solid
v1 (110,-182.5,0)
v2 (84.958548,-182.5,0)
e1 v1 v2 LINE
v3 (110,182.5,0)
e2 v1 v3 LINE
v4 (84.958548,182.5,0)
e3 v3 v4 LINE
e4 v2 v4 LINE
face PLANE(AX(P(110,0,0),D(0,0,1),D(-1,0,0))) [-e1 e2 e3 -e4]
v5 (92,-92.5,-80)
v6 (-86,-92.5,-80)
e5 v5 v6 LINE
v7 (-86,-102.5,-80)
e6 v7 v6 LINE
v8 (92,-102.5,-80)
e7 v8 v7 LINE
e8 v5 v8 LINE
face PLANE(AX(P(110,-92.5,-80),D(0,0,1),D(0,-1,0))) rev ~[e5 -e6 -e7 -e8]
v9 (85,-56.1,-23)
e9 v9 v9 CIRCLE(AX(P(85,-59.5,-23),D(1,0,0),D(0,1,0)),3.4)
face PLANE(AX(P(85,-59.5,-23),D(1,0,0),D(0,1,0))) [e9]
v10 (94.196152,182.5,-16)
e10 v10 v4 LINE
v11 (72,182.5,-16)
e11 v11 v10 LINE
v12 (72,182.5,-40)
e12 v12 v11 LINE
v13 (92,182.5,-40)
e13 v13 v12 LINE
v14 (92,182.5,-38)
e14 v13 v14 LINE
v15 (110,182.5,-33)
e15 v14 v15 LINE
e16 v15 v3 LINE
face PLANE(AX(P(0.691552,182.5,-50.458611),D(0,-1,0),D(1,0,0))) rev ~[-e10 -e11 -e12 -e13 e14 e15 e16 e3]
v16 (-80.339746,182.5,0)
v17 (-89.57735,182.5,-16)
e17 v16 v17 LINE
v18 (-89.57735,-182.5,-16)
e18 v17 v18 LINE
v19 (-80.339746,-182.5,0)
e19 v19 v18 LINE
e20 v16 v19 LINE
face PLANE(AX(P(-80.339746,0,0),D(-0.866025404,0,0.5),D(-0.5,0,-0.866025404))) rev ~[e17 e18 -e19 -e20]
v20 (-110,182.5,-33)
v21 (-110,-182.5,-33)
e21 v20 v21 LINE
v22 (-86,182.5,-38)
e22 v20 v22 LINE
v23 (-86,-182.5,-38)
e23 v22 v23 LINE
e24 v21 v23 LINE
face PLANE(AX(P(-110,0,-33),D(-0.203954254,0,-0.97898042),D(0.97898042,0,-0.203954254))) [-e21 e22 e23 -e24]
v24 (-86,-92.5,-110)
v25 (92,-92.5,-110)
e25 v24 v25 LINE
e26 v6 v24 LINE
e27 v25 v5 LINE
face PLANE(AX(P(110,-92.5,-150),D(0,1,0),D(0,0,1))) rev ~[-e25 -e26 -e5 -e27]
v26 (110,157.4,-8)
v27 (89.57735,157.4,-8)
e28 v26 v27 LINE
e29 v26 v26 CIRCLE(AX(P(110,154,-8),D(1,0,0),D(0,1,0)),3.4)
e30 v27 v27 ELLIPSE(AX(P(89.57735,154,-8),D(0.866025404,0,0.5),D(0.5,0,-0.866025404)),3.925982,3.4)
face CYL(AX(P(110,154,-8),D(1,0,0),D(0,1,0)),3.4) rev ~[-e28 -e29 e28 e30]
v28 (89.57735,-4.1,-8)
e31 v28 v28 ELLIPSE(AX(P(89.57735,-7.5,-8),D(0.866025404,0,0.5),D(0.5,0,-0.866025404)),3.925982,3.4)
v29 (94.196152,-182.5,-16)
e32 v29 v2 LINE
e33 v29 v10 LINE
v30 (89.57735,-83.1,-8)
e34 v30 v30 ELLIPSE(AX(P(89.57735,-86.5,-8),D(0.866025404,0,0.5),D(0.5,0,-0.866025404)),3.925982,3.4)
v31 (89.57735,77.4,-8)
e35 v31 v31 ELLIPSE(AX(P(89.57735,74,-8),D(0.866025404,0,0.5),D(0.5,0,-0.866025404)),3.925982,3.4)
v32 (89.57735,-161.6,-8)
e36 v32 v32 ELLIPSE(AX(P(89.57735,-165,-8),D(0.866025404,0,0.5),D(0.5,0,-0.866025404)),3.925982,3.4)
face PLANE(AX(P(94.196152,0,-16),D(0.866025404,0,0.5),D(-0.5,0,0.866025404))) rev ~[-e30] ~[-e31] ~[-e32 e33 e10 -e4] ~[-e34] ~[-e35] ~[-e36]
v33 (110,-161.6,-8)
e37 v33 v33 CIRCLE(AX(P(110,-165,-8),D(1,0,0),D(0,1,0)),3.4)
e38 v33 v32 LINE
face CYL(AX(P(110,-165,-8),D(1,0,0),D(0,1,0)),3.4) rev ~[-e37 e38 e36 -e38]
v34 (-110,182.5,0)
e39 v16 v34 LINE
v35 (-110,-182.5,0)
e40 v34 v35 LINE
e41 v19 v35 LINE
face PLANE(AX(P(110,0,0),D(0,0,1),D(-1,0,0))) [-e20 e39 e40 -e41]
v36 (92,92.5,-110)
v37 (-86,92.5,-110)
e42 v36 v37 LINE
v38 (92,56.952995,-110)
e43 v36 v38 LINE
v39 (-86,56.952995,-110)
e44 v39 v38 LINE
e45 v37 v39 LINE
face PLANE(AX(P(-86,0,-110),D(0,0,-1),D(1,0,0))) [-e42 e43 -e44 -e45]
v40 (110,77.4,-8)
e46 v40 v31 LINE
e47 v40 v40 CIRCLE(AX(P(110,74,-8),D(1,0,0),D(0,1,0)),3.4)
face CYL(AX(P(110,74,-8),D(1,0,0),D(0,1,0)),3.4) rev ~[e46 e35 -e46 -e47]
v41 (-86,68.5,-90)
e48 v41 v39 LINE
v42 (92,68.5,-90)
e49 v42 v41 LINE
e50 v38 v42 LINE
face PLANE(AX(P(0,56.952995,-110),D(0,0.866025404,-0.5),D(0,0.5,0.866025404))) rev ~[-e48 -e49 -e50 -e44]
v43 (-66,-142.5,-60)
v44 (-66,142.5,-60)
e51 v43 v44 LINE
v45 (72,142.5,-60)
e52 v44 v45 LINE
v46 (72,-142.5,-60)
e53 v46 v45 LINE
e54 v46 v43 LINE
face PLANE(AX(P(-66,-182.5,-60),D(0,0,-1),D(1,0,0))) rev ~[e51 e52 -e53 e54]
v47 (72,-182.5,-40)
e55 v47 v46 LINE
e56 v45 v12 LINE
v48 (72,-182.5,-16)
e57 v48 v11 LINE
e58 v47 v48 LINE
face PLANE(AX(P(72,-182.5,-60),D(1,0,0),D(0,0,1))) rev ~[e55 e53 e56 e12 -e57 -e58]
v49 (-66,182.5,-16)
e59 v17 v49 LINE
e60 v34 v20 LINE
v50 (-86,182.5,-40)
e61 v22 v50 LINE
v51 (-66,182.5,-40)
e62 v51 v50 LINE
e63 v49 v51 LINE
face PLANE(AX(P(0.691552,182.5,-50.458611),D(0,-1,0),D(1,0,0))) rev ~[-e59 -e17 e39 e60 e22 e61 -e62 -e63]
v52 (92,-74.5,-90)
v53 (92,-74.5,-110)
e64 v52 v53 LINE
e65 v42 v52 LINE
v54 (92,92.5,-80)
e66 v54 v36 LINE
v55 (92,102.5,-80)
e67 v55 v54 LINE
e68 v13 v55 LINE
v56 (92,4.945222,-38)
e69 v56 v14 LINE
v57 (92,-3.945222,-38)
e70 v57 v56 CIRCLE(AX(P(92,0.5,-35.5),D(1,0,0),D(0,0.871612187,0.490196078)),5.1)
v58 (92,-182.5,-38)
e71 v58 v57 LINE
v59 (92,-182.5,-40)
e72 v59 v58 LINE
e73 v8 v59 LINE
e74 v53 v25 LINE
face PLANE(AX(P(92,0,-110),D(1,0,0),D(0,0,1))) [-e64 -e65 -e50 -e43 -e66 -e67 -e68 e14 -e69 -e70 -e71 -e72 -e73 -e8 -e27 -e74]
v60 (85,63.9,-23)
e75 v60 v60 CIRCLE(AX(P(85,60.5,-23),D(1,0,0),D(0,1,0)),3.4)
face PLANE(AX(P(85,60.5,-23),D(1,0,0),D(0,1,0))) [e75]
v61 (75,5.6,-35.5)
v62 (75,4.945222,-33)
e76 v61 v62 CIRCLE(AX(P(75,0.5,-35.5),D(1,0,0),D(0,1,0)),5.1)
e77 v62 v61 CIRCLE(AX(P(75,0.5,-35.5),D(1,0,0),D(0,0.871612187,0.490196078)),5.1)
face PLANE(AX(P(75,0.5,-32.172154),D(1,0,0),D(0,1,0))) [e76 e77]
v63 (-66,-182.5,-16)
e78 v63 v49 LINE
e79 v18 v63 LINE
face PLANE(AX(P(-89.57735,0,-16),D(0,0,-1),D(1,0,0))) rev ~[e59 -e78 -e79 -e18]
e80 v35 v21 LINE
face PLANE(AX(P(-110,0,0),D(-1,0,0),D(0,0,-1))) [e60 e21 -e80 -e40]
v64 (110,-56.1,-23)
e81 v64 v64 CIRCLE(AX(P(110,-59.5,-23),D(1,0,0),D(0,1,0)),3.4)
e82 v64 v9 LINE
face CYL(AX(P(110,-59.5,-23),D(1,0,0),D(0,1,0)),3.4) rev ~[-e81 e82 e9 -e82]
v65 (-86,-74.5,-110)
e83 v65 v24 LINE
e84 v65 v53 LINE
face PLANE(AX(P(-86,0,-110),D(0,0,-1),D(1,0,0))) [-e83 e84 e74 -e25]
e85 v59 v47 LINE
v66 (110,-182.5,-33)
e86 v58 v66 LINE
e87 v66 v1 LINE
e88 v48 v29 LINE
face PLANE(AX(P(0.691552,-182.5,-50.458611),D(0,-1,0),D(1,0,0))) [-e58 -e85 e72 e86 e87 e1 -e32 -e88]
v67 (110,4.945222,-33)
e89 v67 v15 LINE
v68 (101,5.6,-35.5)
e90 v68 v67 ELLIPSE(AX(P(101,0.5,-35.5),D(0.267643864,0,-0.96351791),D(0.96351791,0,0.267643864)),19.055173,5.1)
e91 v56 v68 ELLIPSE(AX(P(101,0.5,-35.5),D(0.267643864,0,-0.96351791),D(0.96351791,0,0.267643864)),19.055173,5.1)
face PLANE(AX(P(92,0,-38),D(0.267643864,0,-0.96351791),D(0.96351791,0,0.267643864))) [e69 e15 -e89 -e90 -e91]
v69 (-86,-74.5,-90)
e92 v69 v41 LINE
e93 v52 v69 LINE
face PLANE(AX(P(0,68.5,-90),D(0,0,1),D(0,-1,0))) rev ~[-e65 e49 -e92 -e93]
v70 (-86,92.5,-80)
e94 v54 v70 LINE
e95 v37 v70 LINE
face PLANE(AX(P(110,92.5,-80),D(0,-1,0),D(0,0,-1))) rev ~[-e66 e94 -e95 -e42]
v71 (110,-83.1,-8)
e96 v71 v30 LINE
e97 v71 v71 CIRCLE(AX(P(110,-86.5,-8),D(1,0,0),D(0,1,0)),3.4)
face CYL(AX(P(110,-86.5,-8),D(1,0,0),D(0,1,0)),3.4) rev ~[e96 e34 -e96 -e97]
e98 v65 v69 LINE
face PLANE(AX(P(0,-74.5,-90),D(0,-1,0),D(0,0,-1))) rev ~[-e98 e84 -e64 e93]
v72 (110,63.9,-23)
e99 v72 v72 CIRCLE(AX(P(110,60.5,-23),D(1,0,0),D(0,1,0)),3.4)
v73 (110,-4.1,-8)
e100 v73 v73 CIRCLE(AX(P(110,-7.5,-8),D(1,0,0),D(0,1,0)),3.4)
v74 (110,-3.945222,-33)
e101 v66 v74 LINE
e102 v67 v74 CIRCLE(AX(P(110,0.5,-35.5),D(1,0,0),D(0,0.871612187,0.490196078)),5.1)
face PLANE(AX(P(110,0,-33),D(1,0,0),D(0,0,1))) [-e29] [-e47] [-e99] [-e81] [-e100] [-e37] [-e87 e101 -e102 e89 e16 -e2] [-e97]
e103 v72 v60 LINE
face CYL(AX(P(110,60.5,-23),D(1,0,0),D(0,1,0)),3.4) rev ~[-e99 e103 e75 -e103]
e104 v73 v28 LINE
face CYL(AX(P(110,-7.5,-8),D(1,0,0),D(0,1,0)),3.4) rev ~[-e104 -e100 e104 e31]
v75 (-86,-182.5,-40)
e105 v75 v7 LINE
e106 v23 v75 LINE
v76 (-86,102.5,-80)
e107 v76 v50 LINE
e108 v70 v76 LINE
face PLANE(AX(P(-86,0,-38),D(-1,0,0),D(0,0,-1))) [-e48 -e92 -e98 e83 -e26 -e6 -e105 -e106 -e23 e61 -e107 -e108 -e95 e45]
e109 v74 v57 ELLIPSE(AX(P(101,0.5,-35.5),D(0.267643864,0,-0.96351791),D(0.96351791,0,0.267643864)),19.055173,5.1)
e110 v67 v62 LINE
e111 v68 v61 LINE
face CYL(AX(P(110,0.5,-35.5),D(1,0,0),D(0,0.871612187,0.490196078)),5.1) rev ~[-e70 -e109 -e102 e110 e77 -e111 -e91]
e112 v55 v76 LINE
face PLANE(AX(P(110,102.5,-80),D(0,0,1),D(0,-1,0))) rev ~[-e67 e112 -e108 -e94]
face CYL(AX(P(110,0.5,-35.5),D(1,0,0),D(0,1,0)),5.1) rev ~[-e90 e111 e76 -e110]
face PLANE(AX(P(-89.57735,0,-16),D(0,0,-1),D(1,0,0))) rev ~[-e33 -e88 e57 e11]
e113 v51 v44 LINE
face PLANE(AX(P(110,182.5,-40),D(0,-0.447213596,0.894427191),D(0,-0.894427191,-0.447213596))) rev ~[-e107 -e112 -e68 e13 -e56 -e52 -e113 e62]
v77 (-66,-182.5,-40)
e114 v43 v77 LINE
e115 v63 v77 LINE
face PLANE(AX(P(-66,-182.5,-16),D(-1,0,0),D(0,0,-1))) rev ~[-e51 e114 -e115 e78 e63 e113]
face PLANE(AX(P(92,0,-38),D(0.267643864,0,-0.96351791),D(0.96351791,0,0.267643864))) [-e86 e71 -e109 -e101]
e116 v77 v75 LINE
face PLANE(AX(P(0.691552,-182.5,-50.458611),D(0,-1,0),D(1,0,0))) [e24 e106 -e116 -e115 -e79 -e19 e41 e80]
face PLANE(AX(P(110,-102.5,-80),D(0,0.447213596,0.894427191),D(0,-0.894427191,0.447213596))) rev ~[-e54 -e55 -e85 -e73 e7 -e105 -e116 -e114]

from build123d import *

# Parameters (mm, degrees)
F1_DEPTH  = 182.5
F3_DEPTH  = 200
F5_DEPTH  = 200
F7_DEPTH  = 220.001
F8_W      = 138
F8_H      = 20
F8_H_2    = 24
F9_DEPTH  = 365.001
F12_DEPTH = 35
F10_R     = 3.4
F14_DEPTH = 22.3866406461
F13_R     = 3.4
F15_DEPTH = 25
F16_DEPTH = 25


with BuildPart() as f1:
    # F0 (on Front) → F1 (new body, symmetric)
    with BuildSketch(Plane.XZ):
        Polygon((110, 0), (-110, 0), (-110, -33), (-86, -38), (-86, -110), (92, -110), (92, -38), (110, -33), align=None)
    extrude(amount=F1_DEPTH, both=True)

    # F2 (on Front) → F3 (cut, symmetric)
    with BuildSketch(Plane.XZ):
        Polygon((84.9585481157, 0), (-80.3397459622, 0), (-89.5773502692, -16), (94.1961524227, -16), align=None)
    extrude(amount=F3_DEPTH, both=True, mode=Mode.SUBTRACT)

    # F4 (on Right) → F5 (cut, symmetric)
    with BuildSketch(Plane.YZ):
        Polygon((-74.5, -90), (-74.5, -110), (56.9529946162, -110), (68.5, -90), align=None)
    extrude(amount=F5_DEPTH, both=True, mode=Mode.SUBTRACT)

    # F6 (on face) → F7 (cut, through all)
    with BuildSketch(Plane.YZ.offset(110)):
        Polygon((-102.5, -80), (-182.5, -40), (-182.5, -150), (-92.5, -150), (-92.5, -80), align=None)
        Polygon((182.5, -150), (182.5, -40), (102.5, -80), (92.5, -80), (92.5, -150), align=None)
    extrude(amount=-F7_DEPTH, mode=Mode.SUBTRACT)

    # F8 (on face) → F9 (cut, through all)
    with BuildSketch(Plane.XZ.offset(182.5)):
        with Locations((3, -50)):
            Rectangle(F8_W, F8_H)
        with Locations((3, -28)):
            Rectangle(F8_W, F8_H_2)
    extrude(amount=-F9_DEPTH, mode=Mode.SUBTRACT)

    # F11 (on face) → F12 (cut)
    with BuildSketch(Plane.YZ.offset(110)):
        with BuildLine():
            Line((-3.9452221542, -33), (4.9452221542, -33))
            ThreePointArc((4.9452221542, -33), (0.5, -30.4), (-3.9452221542, -33))
        make_face()
        with BuildLine():
            ThreePointArc((-3.9452221542, -33), (-0.7921623377, -40.4335906289), (5.6, -35.5))
            ThreePointArc((5.6, -35.5), (5.4335906289, -34.2078376623), (4.9452221542, -33))
            Line((4.9452221542, -33), (-3.9452221542, -33))
        make_face()
    extrude(amount=-F12_DEPTH, mode=Mode.SUBTRACT)

    # F10 (on face) → F14 (cut, through all)
    with BuildSketch(Plane.YZ.offset(110)):
        with Locations((-165, -8)):
            Circle(F10_R)
        with Locations((-86.5, -8)):
            Circle(F10_R)
        with Locations((-7.5, -8)):
            Circle(F10_R)
        with Locations((74, -8)):
            Circle(F10_R)
        with Locations((154, -8)):
            Circle(F10_R)
    extrude(amount=-F14_DEPTH, mode=Mode.SUBTRACT)

    # F13 (on face) → F15 (cut)
    with BuildSketch(Plane.YZ.offset(110)):
        with Locations((-59.5, -23)):
            Circle(F13_R)
        with Locations((60.5, -23)):
            Circle(F13_R)
    extrude(amount=-F15_DEPTH, mode=Mode.SUBTRACT)

    # F13 (on face) → F16 (cut)
    with BuildSketch(Plane.YZ.offset(110)):
        with Locations((-59.5, -23)):
            Circle(F13_R)
        with Locations((60.5, -23)):
            Circle(F13_R)
    extrude(amount=-F16_DEPTH, mode=Mode.SUBTRACT)


solid = f1.part
